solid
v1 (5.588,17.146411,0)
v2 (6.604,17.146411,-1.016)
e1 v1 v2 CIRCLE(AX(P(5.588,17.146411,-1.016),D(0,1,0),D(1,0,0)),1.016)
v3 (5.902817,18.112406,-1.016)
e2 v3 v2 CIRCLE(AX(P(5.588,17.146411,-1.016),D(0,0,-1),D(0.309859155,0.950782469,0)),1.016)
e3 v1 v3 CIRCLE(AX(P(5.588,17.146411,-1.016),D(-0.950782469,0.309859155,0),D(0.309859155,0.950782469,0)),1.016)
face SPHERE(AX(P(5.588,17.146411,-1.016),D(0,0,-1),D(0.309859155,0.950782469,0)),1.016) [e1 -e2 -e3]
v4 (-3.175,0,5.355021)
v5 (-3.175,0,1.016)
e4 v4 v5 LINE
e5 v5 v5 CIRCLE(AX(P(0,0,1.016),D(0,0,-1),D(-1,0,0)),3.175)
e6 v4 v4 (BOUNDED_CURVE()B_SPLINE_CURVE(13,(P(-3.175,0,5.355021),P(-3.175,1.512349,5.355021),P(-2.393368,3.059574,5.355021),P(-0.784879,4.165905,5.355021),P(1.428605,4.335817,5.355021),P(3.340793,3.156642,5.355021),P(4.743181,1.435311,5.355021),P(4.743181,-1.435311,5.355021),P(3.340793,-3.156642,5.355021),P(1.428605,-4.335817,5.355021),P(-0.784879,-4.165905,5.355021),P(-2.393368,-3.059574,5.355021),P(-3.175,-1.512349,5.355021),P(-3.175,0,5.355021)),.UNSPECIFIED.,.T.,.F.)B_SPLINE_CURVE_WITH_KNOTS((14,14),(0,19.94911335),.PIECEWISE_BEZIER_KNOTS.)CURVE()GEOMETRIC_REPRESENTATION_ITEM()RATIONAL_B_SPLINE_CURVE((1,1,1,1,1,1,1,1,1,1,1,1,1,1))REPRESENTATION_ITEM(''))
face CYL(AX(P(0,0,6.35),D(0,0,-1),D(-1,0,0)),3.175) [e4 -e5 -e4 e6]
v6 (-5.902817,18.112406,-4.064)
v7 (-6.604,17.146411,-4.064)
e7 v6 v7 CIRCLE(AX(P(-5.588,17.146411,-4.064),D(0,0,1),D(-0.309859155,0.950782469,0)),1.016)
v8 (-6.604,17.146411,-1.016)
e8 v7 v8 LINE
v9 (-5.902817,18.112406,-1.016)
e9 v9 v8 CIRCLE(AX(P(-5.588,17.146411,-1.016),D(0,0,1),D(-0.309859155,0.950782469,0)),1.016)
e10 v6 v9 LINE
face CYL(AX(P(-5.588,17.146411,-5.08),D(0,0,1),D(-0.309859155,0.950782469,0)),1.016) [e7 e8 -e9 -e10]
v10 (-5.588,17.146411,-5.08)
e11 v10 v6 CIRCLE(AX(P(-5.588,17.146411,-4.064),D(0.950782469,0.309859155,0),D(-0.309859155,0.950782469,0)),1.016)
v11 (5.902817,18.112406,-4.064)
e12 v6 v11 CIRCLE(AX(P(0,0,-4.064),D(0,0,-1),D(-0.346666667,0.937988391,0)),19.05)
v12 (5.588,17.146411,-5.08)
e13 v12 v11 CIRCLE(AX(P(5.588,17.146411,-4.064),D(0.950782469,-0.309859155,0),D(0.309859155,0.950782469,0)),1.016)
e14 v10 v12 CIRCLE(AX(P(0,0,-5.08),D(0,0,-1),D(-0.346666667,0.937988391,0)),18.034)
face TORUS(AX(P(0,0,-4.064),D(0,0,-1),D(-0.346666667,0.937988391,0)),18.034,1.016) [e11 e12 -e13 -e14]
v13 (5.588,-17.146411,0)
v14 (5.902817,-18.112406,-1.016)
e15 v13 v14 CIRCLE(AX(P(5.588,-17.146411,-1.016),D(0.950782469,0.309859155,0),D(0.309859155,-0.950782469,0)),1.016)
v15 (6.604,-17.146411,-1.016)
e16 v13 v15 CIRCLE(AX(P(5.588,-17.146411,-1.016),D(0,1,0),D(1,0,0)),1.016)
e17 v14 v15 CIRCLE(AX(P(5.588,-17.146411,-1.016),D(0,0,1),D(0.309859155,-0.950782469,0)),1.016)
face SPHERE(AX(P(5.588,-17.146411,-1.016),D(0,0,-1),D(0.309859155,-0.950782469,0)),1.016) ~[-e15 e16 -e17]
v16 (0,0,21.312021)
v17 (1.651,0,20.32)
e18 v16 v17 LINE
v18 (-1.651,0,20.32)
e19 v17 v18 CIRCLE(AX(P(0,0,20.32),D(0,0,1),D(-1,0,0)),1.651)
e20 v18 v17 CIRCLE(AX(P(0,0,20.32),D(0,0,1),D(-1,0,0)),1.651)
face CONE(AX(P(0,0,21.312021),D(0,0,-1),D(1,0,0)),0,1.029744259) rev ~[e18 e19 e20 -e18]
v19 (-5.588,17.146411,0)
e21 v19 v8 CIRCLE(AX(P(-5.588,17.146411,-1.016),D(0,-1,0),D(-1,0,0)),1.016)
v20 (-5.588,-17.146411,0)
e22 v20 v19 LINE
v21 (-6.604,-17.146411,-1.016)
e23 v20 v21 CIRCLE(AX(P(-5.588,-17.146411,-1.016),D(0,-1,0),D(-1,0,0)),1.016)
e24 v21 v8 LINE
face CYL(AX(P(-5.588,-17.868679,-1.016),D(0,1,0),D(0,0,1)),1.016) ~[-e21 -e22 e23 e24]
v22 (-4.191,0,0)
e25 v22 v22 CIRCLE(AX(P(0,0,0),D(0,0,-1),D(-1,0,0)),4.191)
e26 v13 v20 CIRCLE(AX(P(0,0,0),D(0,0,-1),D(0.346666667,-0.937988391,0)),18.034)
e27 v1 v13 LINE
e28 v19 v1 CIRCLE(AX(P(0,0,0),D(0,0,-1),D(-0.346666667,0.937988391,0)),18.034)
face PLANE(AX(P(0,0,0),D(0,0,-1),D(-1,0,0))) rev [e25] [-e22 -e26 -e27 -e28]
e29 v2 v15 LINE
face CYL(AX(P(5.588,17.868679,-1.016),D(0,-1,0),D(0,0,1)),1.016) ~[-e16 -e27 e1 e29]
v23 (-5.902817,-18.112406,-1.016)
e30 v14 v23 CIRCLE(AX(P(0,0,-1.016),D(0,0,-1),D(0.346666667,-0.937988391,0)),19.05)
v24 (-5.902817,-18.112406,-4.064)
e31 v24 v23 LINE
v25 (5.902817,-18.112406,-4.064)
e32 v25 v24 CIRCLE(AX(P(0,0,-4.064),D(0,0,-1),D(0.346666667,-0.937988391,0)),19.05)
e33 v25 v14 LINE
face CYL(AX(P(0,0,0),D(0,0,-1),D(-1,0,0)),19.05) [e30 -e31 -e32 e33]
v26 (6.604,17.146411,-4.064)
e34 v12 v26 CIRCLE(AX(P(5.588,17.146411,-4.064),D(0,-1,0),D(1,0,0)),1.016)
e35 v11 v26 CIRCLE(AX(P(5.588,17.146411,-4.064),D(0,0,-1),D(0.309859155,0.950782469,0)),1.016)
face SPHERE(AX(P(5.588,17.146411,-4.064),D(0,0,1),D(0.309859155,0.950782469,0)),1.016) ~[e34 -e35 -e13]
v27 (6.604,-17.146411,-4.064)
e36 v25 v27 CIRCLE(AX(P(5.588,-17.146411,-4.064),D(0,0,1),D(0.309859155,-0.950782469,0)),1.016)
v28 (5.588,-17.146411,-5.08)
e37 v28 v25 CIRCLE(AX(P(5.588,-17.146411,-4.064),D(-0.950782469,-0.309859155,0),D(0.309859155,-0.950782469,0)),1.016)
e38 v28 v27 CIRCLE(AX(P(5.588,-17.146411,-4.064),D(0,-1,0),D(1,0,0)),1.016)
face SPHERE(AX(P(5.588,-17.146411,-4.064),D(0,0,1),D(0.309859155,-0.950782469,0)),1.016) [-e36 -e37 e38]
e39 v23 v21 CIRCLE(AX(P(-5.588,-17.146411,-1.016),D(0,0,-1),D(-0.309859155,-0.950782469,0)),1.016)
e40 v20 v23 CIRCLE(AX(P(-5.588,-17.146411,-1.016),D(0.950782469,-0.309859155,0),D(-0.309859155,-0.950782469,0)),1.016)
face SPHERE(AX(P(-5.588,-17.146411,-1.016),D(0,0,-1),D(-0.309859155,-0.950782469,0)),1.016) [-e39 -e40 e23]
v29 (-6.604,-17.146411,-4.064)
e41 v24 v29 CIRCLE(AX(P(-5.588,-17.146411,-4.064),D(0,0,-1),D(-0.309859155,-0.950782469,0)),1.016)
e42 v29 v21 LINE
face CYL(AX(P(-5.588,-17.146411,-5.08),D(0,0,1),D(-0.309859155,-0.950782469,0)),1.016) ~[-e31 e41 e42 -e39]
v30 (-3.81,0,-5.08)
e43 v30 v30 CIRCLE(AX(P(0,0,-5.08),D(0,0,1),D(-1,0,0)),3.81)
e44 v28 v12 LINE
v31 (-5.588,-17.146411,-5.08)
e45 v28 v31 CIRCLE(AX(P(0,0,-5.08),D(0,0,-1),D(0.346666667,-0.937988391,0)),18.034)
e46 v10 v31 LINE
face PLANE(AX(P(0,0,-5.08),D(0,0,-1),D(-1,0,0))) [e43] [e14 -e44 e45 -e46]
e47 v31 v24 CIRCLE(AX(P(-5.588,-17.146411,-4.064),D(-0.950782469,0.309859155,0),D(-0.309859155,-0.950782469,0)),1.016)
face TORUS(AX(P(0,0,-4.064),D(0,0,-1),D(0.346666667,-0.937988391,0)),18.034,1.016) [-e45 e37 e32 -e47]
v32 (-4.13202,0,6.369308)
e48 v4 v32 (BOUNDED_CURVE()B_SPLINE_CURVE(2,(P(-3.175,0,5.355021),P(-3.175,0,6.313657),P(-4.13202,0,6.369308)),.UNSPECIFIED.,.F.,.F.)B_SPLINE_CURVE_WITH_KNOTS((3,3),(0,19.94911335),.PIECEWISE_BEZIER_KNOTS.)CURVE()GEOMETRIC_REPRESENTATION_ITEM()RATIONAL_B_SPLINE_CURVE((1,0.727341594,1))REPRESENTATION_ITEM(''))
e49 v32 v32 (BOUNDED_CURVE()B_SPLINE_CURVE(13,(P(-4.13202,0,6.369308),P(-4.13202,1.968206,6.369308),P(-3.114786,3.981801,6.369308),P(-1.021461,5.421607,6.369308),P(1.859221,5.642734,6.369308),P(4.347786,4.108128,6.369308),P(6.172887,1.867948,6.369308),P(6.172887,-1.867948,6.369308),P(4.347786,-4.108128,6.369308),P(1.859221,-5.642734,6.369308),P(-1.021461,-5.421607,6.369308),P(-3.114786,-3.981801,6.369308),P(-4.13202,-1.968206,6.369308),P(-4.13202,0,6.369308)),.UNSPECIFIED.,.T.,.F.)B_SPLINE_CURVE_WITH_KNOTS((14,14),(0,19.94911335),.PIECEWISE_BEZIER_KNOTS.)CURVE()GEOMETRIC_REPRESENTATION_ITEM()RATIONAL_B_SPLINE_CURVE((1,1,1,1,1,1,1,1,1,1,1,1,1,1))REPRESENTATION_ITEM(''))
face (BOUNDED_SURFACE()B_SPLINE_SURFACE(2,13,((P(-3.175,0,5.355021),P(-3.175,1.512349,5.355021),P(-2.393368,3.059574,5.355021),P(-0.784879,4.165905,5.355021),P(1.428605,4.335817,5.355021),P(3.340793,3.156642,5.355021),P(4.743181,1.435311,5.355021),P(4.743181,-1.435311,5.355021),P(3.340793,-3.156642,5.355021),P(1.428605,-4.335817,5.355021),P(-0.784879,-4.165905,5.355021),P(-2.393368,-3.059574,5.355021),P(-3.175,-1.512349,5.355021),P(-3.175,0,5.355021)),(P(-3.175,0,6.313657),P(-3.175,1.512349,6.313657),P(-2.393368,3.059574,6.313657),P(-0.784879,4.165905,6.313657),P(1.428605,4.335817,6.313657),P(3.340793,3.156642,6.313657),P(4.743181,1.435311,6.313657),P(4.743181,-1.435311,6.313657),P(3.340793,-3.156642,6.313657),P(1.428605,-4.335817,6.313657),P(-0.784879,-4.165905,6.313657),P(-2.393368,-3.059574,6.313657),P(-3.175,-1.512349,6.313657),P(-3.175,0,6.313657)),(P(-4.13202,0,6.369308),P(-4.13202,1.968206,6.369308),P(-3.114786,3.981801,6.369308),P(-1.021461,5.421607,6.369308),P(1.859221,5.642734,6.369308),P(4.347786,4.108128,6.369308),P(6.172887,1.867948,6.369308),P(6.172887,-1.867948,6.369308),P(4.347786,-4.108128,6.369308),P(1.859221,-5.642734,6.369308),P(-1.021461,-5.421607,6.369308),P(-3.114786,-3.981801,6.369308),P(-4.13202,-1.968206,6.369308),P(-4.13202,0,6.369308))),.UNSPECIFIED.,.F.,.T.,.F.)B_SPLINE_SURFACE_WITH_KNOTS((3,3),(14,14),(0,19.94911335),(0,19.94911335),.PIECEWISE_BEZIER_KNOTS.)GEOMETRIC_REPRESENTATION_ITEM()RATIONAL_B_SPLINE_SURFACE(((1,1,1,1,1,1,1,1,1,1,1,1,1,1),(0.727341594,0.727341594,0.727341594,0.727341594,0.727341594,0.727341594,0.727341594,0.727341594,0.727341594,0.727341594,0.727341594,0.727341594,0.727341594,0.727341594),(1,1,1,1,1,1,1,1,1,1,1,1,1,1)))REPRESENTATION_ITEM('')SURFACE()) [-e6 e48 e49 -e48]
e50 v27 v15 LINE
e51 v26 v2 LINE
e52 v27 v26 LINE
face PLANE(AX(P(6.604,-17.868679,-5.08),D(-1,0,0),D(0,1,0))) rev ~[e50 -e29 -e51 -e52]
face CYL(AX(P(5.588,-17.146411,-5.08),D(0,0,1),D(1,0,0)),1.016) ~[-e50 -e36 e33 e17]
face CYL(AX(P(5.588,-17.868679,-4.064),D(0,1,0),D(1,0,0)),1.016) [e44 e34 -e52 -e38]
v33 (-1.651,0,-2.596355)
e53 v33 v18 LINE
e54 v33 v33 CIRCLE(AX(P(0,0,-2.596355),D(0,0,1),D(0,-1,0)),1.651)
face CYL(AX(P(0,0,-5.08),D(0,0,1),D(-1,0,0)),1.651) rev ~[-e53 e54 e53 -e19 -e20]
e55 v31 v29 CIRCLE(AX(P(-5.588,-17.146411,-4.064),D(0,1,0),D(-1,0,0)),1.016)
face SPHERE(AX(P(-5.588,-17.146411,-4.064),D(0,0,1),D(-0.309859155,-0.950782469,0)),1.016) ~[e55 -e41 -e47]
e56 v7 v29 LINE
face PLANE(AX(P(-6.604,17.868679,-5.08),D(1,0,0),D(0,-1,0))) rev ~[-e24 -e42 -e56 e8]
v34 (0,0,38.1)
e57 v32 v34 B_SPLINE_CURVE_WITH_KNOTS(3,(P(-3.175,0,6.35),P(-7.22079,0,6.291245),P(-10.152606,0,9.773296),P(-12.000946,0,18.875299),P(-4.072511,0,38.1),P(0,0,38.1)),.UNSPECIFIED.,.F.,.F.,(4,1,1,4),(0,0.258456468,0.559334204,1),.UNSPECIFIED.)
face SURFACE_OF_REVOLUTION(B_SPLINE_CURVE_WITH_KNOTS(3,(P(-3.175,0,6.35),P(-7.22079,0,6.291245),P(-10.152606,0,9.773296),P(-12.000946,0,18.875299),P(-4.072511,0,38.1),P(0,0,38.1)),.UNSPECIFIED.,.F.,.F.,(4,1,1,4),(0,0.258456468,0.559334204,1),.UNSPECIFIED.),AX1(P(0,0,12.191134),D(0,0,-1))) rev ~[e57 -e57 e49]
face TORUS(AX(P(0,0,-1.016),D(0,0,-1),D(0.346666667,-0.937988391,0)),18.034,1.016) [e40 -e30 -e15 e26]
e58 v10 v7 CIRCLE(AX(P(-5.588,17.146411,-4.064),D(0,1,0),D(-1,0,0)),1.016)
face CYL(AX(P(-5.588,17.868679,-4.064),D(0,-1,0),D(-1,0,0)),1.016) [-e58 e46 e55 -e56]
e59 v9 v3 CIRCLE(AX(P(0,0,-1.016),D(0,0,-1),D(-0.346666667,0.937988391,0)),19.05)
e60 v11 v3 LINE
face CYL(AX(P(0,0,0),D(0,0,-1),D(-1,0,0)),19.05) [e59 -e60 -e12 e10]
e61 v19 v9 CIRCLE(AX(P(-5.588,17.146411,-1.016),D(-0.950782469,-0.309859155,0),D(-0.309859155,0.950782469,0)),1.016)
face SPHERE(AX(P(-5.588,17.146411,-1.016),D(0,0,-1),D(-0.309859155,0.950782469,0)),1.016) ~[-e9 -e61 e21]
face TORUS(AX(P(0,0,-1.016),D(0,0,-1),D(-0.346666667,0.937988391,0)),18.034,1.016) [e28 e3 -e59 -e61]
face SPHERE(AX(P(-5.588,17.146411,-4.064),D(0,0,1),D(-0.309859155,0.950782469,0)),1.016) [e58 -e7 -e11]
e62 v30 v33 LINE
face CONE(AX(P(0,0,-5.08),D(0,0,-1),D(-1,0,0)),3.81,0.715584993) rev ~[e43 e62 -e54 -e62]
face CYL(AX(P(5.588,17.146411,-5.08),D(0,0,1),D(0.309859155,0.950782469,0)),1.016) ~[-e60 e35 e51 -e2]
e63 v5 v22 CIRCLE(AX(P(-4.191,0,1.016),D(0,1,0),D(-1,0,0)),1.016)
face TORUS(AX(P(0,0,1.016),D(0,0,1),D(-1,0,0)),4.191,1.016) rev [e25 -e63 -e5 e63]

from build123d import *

# Parameters (mm, degrees)
F3_D           = 3.302
F3_DEPTH       = 25.4
F3_CSINK_D     = 7.62
F3_CSINK_ANGLE = 82
F3_TIP         = 0.992020882
F5_DEPTH       = 7.62
F6_R           = 1.016


with BuildPart() as f1:
    # F0 (on Front) → F1 (revolve)
    with BuildSketch(Plane.XZ):
        with BuildLine():
            Line((-3.175, 6.35), (-3.175, 0))
            Line((-3.175, 0), (-19.05, 0))
            Line((-19.05, 0), (-19.05, -5.08))
            Line((-19.05, -5.08), (0, -5.08))
            Line((0, -5.08), (0, 38.1))
            add(Edge.make_bspline(
                [(-3.175, 6.35), (-7.2207896582, 6.2912448099), (-10.1526060146, 9.7732957635), (-12.0009457177, 18.875299473), (-4.072510735, 38.1), (0, 38.1)],
                knots=[0, 0, 0, 0, 0.2584564677, 0.5593342036, 1, 1, 1, 1], degree=3))
        make_face()
    revolve(axis=Axis((0, 0, 12.1911335737), (0, 0, -1)))

    # F3
    with Locations(Plane(origin=(0, 0, -5.08), x_dir=(1, 0, 0), z_dir=(0, 0, -1))):
        with Locations((0, 0)):
            CounterSinkHole(F3_D / 2, F3_CSINK_D / 2, depth=F3_DEPTH, counter_sink_angle=F3_CSINK_ANGLE)
            with Locations((0, 0, -(F3_DEPTH + F3_TIP / 2))):  # 118° drill point
                Cone(0, F3_D / 2, F3_TIP, mode=Mode.SUBTRACT)

    # F4 (on face) → F5 (cut)
    with BuildSketch(Plane(origin=(0, 0, -5.08), x_dir=(1, 0, 0), z_dir=(0, 0, -1))):
        with BuildLine():
            Line((-6.604, -17.8686788544), (-6.604, 17.8686788544))
            ThreePointArc((-6.604, 17.8686788544), (-19.05, 0), (-6.604, -17.8686788544))
        make_face()
        with BuildLine():
            ThreePointArc((19.05, 0), (15.6318377039, 10.8879819067), (6.604, 17.8686788544))
            Line((6.604, 17.8686788544), (6.604, -17.8686788544))
            ThreePointArc((6.604, -17.8686788544), (15.6318377039, -10.8879819067), (19.05, 0))
        make_face()
    extrude(amount=-F5_DEPTH, mode=Mode.SUBTRACT)

    # F6
    f6_edges = [f1.edges().sort_by_distance(p)[0] for p in [
        (3.175, 0, 6.35),
        (3.175, 0, 0),
        (0, 19.05, 0),
        (0, 19.05, -5.08),
        (-6.604, 0, -5.08),
        (6.604, 0, -5.08),
        (-6.604, 0, 0),
        (6.604, 0, 0),
        (6.604, -17.868679, -2.54),
        (6.604, 17.868679, -2.54),
        (-6.604, -17.868679, -2.54),
        (-6.604, 17.868679, -2.54),
        (0, -19.05, 0),
        (0, -19.05, -5.08),
    ]]
    fillet(f6_edges, radius=F6_R)


solid = f1.part
